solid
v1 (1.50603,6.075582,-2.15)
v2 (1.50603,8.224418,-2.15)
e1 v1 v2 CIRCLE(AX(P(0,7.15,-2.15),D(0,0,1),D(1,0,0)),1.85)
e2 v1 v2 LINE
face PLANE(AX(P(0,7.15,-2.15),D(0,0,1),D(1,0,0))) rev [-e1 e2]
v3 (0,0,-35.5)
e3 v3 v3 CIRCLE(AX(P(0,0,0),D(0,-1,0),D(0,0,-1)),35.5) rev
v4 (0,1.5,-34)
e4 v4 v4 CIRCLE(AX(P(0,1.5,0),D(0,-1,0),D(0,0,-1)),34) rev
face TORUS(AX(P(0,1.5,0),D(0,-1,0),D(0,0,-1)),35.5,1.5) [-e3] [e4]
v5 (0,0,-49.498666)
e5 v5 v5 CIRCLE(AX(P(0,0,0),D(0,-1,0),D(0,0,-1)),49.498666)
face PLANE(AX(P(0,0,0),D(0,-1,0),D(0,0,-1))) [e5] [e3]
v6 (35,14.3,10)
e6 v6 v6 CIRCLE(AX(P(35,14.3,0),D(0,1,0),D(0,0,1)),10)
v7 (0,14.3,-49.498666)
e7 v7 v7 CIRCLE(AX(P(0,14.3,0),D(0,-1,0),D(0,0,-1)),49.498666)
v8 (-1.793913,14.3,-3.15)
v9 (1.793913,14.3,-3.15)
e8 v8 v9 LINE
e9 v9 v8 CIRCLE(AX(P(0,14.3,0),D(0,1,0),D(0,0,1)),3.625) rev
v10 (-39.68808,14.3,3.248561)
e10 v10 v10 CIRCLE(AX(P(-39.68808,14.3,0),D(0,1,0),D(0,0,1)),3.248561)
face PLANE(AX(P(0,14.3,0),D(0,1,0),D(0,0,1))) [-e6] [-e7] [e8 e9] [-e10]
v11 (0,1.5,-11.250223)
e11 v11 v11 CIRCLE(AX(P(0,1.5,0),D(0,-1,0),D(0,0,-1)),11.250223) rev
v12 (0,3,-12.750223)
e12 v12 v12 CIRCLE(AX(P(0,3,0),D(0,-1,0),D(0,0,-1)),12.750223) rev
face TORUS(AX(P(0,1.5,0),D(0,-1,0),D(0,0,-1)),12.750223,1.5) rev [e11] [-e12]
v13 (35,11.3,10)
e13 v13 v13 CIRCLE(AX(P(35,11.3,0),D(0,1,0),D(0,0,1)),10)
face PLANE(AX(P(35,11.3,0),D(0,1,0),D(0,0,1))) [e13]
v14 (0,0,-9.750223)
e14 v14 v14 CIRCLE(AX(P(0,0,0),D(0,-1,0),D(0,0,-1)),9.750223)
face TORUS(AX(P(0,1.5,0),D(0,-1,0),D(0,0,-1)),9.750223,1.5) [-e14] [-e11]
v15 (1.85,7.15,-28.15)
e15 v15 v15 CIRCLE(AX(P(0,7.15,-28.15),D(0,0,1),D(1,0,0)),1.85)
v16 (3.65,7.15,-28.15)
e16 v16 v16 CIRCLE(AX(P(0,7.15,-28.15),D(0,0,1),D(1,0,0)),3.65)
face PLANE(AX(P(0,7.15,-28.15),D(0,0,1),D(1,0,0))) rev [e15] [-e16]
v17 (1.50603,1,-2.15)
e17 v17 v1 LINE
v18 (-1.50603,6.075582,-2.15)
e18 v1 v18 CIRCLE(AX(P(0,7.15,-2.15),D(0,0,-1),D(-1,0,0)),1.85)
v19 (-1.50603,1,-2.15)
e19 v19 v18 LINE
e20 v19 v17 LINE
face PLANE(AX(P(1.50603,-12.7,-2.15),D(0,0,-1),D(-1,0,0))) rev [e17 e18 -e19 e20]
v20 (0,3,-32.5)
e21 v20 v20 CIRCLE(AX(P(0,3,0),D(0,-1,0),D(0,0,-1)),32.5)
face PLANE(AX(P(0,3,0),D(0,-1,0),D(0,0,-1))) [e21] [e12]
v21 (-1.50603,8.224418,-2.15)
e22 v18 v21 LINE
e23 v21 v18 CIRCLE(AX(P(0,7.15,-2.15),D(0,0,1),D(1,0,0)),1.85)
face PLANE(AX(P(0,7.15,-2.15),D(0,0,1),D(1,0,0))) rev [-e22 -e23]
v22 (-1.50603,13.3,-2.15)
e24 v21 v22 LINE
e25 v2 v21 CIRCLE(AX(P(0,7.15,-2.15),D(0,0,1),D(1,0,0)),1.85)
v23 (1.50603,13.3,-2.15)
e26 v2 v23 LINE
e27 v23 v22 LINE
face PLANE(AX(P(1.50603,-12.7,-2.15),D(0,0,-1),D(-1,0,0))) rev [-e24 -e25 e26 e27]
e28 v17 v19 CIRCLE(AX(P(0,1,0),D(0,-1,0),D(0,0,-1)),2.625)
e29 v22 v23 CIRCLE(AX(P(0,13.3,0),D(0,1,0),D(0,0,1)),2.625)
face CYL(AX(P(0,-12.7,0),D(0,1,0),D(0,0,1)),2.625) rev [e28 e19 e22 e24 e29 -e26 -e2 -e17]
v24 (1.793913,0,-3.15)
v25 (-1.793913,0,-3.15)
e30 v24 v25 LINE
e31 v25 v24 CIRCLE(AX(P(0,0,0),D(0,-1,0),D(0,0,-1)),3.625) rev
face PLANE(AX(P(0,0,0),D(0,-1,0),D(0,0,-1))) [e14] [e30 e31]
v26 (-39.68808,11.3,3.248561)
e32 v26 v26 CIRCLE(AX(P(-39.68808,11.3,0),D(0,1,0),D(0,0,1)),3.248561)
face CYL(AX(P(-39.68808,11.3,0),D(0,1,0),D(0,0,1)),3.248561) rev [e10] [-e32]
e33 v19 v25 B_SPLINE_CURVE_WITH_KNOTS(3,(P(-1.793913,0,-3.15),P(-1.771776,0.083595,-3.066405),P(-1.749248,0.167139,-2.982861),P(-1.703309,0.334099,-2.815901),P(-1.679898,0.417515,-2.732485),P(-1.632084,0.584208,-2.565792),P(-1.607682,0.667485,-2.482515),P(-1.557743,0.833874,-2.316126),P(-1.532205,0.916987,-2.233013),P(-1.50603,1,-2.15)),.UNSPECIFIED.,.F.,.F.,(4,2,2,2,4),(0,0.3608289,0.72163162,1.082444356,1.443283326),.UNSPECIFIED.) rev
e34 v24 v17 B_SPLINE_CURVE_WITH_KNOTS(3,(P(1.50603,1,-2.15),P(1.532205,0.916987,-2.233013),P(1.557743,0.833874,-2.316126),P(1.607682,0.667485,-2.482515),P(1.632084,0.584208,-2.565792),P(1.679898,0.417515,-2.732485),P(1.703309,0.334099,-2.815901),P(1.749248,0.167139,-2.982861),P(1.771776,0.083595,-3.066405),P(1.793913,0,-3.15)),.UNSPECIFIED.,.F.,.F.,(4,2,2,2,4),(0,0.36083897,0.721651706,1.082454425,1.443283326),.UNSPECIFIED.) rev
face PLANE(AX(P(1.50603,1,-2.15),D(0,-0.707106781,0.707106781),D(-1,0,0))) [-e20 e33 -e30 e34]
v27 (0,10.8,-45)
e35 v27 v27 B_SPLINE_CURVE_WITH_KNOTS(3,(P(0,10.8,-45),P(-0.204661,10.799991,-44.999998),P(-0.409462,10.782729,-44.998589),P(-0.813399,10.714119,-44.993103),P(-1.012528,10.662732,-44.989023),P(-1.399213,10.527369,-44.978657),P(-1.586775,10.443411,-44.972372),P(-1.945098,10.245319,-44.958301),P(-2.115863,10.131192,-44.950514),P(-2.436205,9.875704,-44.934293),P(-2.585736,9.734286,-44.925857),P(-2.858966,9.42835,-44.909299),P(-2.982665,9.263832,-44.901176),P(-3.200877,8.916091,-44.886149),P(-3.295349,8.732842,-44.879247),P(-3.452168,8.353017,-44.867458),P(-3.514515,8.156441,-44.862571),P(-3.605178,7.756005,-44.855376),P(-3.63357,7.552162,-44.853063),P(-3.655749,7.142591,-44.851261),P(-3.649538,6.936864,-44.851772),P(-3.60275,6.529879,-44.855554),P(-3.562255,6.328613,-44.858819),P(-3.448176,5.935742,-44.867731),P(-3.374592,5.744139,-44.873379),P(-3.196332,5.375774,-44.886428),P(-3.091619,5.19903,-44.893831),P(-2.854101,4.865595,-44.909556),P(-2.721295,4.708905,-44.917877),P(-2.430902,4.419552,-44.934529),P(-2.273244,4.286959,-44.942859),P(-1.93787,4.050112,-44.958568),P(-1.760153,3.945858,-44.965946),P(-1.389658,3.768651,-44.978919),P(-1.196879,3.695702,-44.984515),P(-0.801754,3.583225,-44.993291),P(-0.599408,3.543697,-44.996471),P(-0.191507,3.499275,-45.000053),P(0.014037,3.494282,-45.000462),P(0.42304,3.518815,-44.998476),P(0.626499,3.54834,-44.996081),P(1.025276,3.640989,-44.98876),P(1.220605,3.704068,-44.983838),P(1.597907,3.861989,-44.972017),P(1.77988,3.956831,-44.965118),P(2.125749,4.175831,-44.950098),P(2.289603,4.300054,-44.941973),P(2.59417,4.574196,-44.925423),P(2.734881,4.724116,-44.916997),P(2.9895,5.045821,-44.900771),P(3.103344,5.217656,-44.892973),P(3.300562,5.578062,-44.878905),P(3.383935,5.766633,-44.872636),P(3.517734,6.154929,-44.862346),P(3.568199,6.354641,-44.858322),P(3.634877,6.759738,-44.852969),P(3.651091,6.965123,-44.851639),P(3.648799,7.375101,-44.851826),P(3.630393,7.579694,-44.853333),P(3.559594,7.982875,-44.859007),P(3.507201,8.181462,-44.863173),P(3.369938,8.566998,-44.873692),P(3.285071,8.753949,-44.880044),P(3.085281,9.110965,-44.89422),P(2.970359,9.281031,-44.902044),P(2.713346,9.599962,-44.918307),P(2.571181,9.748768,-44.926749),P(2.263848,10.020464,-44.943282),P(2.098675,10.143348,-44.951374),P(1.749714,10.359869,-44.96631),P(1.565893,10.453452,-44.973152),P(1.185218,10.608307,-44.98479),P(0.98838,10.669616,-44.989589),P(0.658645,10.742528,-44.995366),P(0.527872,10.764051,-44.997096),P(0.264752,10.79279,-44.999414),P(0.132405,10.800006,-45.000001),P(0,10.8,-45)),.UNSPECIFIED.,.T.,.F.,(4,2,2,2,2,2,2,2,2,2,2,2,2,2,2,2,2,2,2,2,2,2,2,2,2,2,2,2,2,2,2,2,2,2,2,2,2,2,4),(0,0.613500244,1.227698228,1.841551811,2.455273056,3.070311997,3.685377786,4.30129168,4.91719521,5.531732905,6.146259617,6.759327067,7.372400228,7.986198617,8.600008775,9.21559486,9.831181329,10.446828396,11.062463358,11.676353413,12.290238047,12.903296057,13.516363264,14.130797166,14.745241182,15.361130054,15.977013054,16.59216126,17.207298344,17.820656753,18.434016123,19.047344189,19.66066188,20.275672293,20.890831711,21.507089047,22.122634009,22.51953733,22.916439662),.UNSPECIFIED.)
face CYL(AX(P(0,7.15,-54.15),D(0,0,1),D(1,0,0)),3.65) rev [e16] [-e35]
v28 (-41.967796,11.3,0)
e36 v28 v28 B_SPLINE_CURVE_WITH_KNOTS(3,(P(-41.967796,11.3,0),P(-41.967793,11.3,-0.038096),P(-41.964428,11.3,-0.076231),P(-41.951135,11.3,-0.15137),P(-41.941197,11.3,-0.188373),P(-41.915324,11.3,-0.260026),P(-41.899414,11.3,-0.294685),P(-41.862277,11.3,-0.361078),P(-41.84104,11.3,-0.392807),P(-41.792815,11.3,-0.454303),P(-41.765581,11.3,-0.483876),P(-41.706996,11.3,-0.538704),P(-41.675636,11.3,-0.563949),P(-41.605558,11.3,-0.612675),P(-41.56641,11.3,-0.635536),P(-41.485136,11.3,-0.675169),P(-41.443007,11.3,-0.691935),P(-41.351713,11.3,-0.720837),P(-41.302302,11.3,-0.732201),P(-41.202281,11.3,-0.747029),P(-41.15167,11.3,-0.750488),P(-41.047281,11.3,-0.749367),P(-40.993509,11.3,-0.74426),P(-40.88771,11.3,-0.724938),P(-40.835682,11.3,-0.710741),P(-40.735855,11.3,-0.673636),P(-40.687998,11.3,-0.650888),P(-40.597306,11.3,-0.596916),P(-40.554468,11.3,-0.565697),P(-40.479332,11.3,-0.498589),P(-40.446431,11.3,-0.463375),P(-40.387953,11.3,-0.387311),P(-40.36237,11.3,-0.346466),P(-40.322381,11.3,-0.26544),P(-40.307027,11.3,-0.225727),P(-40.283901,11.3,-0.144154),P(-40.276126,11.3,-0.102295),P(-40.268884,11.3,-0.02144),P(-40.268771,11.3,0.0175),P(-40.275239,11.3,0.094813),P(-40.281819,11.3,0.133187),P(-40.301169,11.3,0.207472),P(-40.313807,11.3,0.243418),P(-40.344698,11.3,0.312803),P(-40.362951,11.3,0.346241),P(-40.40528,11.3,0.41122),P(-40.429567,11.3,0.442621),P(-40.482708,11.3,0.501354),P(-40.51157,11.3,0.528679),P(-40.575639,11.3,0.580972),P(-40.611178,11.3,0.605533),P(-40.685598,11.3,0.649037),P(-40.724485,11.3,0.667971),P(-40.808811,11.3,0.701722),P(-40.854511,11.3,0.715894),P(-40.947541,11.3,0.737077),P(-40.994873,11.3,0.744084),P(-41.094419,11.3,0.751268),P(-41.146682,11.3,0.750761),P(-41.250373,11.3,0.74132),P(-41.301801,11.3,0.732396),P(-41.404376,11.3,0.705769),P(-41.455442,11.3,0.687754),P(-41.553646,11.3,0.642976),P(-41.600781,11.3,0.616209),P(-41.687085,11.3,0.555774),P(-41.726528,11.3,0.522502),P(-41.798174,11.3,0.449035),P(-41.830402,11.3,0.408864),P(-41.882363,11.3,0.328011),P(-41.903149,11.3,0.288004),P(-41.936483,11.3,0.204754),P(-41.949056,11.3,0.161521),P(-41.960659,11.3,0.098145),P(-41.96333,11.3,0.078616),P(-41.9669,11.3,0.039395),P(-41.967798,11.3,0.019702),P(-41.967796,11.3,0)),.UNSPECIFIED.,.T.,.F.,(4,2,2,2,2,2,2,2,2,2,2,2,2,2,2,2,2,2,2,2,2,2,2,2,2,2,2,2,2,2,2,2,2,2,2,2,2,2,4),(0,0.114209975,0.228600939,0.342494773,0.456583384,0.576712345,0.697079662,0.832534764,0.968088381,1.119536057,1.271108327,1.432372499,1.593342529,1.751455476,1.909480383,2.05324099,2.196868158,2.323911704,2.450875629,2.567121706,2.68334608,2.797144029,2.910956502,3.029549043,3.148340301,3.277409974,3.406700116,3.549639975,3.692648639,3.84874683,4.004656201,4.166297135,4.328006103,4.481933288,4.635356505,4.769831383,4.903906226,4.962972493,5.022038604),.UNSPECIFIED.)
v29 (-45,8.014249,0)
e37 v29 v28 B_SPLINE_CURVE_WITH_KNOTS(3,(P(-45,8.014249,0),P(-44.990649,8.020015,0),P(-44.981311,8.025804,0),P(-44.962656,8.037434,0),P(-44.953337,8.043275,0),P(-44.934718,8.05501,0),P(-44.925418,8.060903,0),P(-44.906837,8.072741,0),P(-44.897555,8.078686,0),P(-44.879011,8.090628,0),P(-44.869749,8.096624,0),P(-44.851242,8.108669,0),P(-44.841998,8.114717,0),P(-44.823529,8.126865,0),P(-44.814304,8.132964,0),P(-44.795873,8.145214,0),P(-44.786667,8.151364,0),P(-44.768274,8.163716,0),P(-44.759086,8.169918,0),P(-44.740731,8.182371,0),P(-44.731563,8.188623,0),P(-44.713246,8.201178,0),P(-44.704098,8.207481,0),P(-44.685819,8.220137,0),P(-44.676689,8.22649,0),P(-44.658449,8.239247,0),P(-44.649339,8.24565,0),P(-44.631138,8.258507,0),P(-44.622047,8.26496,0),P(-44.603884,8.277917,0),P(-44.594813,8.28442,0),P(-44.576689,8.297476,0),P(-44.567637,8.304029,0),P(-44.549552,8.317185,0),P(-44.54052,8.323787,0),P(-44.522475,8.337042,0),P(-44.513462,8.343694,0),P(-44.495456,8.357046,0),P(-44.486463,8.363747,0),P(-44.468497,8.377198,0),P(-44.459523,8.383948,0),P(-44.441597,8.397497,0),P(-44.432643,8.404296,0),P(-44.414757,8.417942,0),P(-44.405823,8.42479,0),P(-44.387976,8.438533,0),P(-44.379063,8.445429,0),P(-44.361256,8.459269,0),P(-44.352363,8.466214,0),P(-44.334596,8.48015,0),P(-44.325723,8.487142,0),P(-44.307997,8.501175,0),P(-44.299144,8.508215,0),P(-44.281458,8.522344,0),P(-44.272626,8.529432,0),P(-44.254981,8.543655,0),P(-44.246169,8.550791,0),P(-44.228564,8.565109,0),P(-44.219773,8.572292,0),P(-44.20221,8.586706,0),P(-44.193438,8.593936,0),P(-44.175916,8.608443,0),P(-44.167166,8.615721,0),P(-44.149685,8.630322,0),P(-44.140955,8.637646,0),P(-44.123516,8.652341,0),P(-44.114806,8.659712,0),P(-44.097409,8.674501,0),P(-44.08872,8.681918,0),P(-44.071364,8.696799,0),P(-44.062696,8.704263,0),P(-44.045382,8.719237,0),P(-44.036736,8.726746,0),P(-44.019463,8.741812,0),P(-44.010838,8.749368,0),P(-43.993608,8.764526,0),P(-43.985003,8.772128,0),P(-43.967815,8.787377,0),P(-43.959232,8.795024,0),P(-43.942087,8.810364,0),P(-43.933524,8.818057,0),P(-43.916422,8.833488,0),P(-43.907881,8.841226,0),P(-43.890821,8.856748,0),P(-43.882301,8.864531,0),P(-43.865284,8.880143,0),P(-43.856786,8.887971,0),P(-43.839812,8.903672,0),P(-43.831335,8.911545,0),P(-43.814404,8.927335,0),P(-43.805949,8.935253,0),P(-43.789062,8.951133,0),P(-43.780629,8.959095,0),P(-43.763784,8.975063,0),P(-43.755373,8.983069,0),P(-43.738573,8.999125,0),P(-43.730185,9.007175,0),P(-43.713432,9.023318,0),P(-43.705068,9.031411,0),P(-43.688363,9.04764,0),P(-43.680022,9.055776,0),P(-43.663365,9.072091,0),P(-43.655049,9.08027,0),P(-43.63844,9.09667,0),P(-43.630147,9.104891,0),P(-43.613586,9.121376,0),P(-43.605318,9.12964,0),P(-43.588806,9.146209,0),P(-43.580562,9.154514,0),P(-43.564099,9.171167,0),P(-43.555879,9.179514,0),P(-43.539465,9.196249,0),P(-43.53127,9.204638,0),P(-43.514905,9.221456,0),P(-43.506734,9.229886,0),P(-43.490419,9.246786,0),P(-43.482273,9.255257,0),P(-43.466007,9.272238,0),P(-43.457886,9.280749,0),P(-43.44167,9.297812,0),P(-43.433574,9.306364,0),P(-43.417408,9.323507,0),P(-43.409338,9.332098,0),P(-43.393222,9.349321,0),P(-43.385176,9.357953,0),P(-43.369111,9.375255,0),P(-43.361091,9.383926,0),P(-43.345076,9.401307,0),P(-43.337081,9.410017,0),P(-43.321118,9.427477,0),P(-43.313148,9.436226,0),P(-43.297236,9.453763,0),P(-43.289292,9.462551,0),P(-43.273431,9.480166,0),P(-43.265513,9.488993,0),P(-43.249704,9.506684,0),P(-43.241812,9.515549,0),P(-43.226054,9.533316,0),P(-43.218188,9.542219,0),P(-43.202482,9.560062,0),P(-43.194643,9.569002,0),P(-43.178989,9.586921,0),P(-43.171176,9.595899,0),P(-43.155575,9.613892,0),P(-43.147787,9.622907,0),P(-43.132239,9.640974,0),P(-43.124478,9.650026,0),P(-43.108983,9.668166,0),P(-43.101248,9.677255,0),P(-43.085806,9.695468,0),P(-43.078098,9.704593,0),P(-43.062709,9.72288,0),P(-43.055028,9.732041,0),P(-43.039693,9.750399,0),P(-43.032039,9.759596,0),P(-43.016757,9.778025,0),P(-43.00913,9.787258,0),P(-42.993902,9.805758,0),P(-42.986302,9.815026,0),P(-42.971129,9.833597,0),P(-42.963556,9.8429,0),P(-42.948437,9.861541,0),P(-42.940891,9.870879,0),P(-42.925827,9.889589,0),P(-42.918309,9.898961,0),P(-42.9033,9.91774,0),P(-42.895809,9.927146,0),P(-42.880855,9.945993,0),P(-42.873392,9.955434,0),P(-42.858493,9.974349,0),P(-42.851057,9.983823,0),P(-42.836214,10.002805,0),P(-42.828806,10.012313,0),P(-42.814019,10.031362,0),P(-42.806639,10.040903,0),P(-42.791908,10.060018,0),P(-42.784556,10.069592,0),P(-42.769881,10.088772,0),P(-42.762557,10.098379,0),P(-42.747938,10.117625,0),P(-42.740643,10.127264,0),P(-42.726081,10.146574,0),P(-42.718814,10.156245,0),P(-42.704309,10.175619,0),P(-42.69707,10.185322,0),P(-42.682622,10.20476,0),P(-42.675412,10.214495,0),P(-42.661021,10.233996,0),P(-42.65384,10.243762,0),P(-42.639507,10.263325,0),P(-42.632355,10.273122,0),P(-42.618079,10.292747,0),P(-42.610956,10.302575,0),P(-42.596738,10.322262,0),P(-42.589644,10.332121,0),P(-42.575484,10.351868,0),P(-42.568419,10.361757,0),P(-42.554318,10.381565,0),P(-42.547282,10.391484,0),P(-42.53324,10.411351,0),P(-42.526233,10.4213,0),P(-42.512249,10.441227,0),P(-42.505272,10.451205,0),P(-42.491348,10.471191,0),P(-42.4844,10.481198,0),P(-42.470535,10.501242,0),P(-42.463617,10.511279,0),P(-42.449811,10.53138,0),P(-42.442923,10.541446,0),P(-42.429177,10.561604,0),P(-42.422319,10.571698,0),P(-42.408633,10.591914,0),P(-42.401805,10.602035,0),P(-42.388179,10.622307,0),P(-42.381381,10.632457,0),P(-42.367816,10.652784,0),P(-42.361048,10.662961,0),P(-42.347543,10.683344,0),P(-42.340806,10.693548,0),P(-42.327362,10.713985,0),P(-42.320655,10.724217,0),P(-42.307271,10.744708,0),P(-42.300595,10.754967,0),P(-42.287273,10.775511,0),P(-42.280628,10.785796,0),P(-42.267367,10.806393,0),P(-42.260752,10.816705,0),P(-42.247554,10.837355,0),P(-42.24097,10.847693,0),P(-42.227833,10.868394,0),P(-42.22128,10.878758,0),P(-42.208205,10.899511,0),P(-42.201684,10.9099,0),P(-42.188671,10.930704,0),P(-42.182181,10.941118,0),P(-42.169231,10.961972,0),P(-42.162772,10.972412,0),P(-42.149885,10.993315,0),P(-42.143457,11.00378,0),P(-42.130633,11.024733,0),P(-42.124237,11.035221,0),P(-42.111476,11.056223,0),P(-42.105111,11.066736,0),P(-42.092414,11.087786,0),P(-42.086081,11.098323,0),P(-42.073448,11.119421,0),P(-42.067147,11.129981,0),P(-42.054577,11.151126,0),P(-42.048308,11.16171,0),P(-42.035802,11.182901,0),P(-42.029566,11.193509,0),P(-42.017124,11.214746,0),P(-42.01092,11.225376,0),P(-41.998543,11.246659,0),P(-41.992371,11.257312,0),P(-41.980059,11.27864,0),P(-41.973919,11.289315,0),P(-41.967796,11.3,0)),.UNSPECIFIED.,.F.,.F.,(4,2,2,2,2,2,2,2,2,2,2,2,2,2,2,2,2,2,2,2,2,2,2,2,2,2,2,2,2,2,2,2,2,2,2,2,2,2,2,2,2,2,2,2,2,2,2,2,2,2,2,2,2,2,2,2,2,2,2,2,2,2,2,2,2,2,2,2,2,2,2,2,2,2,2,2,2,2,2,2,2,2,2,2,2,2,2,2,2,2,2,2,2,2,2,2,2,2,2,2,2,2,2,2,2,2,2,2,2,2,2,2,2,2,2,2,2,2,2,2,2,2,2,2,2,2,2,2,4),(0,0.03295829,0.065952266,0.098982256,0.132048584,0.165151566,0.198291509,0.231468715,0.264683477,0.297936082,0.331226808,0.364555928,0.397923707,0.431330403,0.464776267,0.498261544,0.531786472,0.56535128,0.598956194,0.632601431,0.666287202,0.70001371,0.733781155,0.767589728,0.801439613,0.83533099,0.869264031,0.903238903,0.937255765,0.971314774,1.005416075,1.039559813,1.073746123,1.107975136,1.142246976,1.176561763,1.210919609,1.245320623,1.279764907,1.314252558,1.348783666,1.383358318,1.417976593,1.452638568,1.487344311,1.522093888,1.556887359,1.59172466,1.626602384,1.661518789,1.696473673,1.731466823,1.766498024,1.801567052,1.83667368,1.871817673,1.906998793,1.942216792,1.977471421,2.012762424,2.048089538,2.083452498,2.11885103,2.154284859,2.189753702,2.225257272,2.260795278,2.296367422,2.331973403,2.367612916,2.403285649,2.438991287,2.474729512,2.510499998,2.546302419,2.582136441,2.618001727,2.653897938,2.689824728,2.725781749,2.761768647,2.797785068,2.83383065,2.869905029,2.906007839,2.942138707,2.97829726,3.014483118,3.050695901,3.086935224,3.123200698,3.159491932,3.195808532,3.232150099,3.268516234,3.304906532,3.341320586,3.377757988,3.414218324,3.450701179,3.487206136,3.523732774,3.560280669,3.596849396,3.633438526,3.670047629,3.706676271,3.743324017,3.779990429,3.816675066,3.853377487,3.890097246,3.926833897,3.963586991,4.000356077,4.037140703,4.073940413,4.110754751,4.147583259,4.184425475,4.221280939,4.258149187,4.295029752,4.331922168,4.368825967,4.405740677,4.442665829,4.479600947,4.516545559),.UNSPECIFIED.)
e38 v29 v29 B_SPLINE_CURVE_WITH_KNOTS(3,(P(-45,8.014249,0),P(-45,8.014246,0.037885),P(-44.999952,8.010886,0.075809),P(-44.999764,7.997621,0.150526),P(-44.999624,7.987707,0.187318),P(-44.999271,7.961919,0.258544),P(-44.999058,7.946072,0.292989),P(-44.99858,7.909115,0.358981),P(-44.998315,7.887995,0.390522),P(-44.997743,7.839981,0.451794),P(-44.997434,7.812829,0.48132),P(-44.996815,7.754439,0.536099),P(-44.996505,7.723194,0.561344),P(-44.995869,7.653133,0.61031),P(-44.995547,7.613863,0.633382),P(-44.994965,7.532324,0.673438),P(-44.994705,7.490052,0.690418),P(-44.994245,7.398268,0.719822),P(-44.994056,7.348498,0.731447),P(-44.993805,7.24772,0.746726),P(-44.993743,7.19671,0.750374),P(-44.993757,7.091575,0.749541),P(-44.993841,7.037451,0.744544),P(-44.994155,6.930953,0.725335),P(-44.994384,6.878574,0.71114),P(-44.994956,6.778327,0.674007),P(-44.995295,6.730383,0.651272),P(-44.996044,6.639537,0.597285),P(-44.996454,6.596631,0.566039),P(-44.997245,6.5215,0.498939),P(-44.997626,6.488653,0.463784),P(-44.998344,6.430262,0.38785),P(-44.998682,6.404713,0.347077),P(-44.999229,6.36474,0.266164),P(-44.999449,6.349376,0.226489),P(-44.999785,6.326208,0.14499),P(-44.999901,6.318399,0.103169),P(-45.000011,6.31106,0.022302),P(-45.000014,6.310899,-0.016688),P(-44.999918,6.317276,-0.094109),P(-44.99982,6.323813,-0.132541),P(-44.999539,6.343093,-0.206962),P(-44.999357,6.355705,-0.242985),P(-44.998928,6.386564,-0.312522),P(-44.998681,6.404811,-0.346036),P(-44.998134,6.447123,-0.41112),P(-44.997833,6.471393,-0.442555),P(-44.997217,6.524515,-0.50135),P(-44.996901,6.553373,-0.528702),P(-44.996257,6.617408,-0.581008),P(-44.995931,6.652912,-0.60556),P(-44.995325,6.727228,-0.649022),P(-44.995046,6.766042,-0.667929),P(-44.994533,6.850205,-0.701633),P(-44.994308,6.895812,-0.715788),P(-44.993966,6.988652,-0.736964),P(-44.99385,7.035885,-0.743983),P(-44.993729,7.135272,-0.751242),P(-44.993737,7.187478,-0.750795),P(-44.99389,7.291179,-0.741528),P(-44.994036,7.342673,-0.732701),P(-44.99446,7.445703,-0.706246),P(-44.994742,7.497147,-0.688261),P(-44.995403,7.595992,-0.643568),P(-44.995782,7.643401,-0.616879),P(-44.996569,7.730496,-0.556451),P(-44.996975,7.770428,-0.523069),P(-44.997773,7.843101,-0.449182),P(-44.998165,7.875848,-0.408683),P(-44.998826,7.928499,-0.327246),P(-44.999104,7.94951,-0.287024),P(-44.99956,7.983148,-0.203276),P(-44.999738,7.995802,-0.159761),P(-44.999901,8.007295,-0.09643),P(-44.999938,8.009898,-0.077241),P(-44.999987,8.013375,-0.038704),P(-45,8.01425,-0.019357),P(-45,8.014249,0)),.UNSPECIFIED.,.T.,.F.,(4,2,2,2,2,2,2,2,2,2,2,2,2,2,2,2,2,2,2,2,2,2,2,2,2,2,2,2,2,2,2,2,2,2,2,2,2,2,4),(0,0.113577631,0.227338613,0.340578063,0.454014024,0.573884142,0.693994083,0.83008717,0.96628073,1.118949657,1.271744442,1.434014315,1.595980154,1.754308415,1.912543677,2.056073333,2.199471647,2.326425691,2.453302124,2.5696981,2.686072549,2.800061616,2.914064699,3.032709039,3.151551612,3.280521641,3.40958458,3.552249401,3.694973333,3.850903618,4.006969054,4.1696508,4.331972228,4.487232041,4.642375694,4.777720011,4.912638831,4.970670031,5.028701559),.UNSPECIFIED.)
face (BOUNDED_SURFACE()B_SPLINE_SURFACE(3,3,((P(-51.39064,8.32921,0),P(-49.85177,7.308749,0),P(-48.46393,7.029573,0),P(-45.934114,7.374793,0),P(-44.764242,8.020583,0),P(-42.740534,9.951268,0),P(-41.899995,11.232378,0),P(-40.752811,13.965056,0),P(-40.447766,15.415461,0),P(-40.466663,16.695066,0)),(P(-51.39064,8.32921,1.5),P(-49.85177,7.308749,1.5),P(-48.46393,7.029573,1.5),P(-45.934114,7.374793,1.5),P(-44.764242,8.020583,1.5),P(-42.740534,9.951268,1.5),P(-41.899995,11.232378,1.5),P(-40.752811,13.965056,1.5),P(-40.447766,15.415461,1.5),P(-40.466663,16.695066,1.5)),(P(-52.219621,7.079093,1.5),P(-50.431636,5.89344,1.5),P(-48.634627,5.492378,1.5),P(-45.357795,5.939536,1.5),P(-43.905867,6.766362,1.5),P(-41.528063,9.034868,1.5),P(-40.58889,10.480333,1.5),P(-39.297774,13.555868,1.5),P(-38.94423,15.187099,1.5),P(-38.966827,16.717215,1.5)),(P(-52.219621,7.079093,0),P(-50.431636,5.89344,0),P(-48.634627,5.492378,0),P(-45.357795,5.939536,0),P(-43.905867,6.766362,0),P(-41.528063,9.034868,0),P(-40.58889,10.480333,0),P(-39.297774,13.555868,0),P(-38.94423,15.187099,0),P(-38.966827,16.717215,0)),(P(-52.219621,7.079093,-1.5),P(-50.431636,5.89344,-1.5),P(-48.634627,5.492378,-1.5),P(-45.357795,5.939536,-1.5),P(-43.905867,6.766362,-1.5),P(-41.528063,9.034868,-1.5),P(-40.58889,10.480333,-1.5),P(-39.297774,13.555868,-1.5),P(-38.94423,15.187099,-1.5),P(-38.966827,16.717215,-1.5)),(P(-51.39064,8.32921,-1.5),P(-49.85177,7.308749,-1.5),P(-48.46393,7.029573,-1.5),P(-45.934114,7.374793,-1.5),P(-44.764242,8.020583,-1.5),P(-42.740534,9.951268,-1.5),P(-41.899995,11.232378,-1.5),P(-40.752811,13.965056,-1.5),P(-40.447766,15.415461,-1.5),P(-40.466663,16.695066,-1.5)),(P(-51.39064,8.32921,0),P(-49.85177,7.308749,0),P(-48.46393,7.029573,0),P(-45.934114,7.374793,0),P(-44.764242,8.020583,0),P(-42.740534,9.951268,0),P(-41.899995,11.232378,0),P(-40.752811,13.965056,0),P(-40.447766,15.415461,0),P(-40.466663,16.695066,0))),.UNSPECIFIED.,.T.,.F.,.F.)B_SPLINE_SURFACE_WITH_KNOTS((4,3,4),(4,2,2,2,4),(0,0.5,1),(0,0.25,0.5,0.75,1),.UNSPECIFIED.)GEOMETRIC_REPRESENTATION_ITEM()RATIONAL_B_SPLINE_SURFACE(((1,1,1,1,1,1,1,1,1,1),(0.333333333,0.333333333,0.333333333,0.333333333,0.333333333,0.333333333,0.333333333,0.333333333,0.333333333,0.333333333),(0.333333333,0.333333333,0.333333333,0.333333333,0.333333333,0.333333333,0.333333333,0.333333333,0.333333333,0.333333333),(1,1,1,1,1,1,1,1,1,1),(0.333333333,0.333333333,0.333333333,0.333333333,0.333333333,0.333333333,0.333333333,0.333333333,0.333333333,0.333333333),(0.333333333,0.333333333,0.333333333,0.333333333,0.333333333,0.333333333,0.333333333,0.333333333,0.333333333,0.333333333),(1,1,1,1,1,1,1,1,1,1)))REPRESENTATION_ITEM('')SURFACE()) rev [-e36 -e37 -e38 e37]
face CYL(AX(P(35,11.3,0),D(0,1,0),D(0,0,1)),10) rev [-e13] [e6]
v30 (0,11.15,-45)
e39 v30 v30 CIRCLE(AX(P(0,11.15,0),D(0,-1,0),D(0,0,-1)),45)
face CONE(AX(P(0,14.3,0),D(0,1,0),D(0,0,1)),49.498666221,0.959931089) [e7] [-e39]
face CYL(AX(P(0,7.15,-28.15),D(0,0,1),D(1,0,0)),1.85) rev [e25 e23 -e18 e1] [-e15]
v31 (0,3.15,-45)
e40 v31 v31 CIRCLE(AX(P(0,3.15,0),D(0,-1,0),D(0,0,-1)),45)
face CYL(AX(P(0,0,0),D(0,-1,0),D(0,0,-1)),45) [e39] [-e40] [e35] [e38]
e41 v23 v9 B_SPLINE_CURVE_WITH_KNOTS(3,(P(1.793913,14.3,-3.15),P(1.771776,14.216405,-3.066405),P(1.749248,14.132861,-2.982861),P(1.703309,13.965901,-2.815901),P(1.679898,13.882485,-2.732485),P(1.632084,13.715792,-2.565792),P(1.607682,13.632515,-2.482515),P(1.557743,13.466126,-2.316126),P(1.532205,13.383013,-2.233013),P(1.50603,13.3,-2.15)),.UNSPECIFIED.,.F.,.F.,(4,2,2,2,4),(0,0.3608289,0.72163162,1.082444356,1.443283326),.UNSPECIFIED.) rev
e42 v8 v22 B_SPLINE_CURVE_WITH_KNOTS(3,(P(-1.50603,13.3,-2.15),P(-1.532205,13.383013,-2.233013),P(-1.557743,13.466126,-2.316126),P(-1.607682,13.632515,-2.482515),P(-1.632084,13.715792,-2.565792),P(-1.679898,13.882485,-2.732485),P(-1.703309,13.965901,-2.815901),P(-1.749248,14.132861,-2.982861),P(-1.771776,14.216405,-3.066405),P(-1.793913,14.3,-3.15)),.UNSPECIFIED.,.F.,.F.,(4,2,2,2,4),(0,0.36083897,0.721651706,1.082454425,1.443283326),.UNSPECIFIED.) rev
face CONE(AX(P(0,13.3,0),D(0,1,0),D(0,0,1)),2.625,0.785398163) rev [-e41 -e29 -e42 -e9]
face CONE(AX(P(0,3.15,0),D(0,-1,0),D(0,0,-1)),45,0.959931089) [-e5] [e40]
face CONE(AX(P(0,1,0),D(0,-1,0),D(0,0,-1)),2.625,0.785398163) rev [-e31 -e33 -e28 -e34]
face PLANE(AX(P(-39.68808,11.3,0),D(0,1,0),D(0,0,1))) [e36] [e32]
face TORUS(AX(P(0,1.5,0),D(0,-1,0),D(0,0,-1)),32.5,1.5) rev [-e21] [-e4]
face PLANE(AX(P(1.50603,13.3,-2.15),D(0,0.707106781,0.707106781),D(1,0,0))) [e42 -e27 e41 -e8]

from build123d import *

# Parameters (mm, degrees)
CUT_EXTRUDE2_DEPTH   = 27
CHAMFER2_SIZE        = 1
CUT_SWEEP1_PROFILE_R = 0.75
SKETCH24_R           = 3.248561068
CUT_EXTRUDE7_DEPTH   = 3
SKETCH32_R           = 10
CUT_EXTRUDE9_DEPTH   = 3
SKETCH33_R           = 1.85
CUT_EXTRUDE10_DEPTH  = 26
SKETCH34_R           = 3.65
CUT_EXTRUDE11_DEPTH  = 26
CUT_EXTRUDE13_START  = -14.3
SKETCH26_R           = 34
SKETCH26_R_2         = 11.250223146
CUT_EXTRUDE13_DEPTH  = 3
FILLET1_R            = 1.5


with BuildPart() as part:
    # Sketch2 → Revolve1 (revolve)
    with BuildSketch(Plane.XY, mode=Mode.PRIVATE) as revolve1_sk:
        Polygon((0, 0), (-49.498666221, 0), (-45, 3.15), (-45, 11.15), (-49.498666221, 14.3), (0, 14.3), align=None)
    revolve(revolve1_sk.sketch.rotate(Axis((0, 0, 0), (0, 1, 0)), 270), axis=Axis((0, 0, 0), (0, 1, 0)))

    # Sketch4 → Cut-Extrude2 (cut)
    with BuildSketch(Plane(origin=(0, 14.3, 0), x_dir=(1, 0, 0), z_dir=(0, 1, 0))):
        with BuildLine():
            Line((1.506029548, 2.15), (-1.506029548, 2.15))
            ThreePointArc((-1.506029548, 2.15), (0, -2.625), (1.506029548, 2.15))
        make_face()
    extrude(amount=-CUT_EXTRUDE2_DEPTH, mode=Mode.SUBTRACT)

    # Chamfer2
    chamfer2_edges = [part.edges().sort_by_distance(p)[0] for p in [
        (0, 0, 2.625),
        (0, 0, -2.15),
        (0, 14.3, 2.625),
        (0, 14.3, -2.15),
    ]]
    chamfer(chamfer2_edges, length=CHAMFER2_SIZE)

    # Cut-Sweep1: sweep along a path in Sketch9
    with BuildLine() as cut_sweep1_path:  # in the path sketch's own coordinates; laid on its plane below (add() does not lay a ready-made edge on the line's plane)
        add(Edge.make_bspline(
            [(-51.805130379, 7.70415138), (-45.151420928, 3.291923868), (-39.633758445, 11.086700009), (-39.716744994, 16.706140497)],
            knots=[0, 0, 0, 0, 1, 1, 1, 1], degree=3))
    # Cut-Sweep1 profile (on start of the path) → Cut-Sweep1 (sweep, cut)
    with BuildSketch(Plane(origin=(-51.805130379, 7.70415138, 0), x_dir=(0.5526538855740072, 0.8334108727152246, 0), z_dir=(0.8334108727152246, -0.5526538855740072, 0))):
        Circle(CUT_SWEEP1_PROFILE_R)
    sweep(path=Plane.XY * cut_sweep1_path.line, mode=Mode.SUBTRACT)

    # Sketch24 → Cut-Extrude7 (cut)
    with BuildSketch(Plane(origin=(0, 14.3, 0), x_dir=(1, 0, 0), z_dir=(0, 1, 0))):
        with Locations(Location((-39.688079845, 0, 0), (0, 0, 270))):
            Circle(SKETCH24_R)
    extrude(amount=-CUT_EXTRUDE7_DEPTH, mode=Mode.SUBTRACT)

    # Sketch32 → Cut-Extrude9 (cut)
    with BuildSketch(Plane(origin=(0, 14.3, 0), x_dir=(1, 0, 0), z_dir=(0, 1, 0))):
        with Locations(Location((35, 0, 0), (0, 0, 270))):
            Circle(SKETCH32_R)
    extrude(amount=-CUT_EXTRUDE9_DEPTH, mode=Mode.SUBTRACT)

    # Sketch33 → Cut-Extrude10 (cut)
    with BuildSketch(Plane.XY.offset(-2.15)):
        with Locations((0, 7.15)):
            Circle(SKETCH33_R)
    extrude(amount=-CUT_EXTRUDE10_DEPTH, mode=Mode.SUBTRACT)

    # Sketch34 → Cut-Extrude11 (cut)
    with BuildSketch(Plane.XY.offset(-28.15)):
        with Locations((0, 7.15)):
            Circle(SKETCH34_R)
    extrude(amount=-CUT_EXTRUDE11_DEPTH, mode=Mode.SUBTRACT)

    # Sketch26 → Cut-Extrude13 (cut)
    with BuildSketch(Plane(origin=(0, 14.3, 0), x_dir=(1, 0, 0), z_dir=(0, 1, 0)).offset(CUT_EXTRUDE13_START)):
        with Locations(Location((0, 0, 0), (0, 0, 90))):
            Circle(SKETCH26_R)
        with Locations(Location((0, 0, 0), (0, 0, 90))):
            Circle(SKETCH26_R_2, mode=Mode.SUBTRACT)
    extrude(amount=CUT_EXTRUDE13_DEPTH, mode=Mode.SUBTRACT)

    # Fillet1
    fillet1_edges = [part.edges().sort_by_distance(p)[0] for p in [
        (0, 3, 34),
        (0, 3, 11.250223146),
    ]]
    fillet(fillet1_edges, radius=FILLET1_R)
    fillet1_2_edges = [part.edges().sort_by_distance(p)[0] for p in [
        (0, 0, 34),
        (0, 0, 11.250223146),
    ]]
    fillet(fillet1_2_edges, radius=FILLET1_R - 0.0001)  # a hair under: the kernel refuses the full size


solid = part.part
